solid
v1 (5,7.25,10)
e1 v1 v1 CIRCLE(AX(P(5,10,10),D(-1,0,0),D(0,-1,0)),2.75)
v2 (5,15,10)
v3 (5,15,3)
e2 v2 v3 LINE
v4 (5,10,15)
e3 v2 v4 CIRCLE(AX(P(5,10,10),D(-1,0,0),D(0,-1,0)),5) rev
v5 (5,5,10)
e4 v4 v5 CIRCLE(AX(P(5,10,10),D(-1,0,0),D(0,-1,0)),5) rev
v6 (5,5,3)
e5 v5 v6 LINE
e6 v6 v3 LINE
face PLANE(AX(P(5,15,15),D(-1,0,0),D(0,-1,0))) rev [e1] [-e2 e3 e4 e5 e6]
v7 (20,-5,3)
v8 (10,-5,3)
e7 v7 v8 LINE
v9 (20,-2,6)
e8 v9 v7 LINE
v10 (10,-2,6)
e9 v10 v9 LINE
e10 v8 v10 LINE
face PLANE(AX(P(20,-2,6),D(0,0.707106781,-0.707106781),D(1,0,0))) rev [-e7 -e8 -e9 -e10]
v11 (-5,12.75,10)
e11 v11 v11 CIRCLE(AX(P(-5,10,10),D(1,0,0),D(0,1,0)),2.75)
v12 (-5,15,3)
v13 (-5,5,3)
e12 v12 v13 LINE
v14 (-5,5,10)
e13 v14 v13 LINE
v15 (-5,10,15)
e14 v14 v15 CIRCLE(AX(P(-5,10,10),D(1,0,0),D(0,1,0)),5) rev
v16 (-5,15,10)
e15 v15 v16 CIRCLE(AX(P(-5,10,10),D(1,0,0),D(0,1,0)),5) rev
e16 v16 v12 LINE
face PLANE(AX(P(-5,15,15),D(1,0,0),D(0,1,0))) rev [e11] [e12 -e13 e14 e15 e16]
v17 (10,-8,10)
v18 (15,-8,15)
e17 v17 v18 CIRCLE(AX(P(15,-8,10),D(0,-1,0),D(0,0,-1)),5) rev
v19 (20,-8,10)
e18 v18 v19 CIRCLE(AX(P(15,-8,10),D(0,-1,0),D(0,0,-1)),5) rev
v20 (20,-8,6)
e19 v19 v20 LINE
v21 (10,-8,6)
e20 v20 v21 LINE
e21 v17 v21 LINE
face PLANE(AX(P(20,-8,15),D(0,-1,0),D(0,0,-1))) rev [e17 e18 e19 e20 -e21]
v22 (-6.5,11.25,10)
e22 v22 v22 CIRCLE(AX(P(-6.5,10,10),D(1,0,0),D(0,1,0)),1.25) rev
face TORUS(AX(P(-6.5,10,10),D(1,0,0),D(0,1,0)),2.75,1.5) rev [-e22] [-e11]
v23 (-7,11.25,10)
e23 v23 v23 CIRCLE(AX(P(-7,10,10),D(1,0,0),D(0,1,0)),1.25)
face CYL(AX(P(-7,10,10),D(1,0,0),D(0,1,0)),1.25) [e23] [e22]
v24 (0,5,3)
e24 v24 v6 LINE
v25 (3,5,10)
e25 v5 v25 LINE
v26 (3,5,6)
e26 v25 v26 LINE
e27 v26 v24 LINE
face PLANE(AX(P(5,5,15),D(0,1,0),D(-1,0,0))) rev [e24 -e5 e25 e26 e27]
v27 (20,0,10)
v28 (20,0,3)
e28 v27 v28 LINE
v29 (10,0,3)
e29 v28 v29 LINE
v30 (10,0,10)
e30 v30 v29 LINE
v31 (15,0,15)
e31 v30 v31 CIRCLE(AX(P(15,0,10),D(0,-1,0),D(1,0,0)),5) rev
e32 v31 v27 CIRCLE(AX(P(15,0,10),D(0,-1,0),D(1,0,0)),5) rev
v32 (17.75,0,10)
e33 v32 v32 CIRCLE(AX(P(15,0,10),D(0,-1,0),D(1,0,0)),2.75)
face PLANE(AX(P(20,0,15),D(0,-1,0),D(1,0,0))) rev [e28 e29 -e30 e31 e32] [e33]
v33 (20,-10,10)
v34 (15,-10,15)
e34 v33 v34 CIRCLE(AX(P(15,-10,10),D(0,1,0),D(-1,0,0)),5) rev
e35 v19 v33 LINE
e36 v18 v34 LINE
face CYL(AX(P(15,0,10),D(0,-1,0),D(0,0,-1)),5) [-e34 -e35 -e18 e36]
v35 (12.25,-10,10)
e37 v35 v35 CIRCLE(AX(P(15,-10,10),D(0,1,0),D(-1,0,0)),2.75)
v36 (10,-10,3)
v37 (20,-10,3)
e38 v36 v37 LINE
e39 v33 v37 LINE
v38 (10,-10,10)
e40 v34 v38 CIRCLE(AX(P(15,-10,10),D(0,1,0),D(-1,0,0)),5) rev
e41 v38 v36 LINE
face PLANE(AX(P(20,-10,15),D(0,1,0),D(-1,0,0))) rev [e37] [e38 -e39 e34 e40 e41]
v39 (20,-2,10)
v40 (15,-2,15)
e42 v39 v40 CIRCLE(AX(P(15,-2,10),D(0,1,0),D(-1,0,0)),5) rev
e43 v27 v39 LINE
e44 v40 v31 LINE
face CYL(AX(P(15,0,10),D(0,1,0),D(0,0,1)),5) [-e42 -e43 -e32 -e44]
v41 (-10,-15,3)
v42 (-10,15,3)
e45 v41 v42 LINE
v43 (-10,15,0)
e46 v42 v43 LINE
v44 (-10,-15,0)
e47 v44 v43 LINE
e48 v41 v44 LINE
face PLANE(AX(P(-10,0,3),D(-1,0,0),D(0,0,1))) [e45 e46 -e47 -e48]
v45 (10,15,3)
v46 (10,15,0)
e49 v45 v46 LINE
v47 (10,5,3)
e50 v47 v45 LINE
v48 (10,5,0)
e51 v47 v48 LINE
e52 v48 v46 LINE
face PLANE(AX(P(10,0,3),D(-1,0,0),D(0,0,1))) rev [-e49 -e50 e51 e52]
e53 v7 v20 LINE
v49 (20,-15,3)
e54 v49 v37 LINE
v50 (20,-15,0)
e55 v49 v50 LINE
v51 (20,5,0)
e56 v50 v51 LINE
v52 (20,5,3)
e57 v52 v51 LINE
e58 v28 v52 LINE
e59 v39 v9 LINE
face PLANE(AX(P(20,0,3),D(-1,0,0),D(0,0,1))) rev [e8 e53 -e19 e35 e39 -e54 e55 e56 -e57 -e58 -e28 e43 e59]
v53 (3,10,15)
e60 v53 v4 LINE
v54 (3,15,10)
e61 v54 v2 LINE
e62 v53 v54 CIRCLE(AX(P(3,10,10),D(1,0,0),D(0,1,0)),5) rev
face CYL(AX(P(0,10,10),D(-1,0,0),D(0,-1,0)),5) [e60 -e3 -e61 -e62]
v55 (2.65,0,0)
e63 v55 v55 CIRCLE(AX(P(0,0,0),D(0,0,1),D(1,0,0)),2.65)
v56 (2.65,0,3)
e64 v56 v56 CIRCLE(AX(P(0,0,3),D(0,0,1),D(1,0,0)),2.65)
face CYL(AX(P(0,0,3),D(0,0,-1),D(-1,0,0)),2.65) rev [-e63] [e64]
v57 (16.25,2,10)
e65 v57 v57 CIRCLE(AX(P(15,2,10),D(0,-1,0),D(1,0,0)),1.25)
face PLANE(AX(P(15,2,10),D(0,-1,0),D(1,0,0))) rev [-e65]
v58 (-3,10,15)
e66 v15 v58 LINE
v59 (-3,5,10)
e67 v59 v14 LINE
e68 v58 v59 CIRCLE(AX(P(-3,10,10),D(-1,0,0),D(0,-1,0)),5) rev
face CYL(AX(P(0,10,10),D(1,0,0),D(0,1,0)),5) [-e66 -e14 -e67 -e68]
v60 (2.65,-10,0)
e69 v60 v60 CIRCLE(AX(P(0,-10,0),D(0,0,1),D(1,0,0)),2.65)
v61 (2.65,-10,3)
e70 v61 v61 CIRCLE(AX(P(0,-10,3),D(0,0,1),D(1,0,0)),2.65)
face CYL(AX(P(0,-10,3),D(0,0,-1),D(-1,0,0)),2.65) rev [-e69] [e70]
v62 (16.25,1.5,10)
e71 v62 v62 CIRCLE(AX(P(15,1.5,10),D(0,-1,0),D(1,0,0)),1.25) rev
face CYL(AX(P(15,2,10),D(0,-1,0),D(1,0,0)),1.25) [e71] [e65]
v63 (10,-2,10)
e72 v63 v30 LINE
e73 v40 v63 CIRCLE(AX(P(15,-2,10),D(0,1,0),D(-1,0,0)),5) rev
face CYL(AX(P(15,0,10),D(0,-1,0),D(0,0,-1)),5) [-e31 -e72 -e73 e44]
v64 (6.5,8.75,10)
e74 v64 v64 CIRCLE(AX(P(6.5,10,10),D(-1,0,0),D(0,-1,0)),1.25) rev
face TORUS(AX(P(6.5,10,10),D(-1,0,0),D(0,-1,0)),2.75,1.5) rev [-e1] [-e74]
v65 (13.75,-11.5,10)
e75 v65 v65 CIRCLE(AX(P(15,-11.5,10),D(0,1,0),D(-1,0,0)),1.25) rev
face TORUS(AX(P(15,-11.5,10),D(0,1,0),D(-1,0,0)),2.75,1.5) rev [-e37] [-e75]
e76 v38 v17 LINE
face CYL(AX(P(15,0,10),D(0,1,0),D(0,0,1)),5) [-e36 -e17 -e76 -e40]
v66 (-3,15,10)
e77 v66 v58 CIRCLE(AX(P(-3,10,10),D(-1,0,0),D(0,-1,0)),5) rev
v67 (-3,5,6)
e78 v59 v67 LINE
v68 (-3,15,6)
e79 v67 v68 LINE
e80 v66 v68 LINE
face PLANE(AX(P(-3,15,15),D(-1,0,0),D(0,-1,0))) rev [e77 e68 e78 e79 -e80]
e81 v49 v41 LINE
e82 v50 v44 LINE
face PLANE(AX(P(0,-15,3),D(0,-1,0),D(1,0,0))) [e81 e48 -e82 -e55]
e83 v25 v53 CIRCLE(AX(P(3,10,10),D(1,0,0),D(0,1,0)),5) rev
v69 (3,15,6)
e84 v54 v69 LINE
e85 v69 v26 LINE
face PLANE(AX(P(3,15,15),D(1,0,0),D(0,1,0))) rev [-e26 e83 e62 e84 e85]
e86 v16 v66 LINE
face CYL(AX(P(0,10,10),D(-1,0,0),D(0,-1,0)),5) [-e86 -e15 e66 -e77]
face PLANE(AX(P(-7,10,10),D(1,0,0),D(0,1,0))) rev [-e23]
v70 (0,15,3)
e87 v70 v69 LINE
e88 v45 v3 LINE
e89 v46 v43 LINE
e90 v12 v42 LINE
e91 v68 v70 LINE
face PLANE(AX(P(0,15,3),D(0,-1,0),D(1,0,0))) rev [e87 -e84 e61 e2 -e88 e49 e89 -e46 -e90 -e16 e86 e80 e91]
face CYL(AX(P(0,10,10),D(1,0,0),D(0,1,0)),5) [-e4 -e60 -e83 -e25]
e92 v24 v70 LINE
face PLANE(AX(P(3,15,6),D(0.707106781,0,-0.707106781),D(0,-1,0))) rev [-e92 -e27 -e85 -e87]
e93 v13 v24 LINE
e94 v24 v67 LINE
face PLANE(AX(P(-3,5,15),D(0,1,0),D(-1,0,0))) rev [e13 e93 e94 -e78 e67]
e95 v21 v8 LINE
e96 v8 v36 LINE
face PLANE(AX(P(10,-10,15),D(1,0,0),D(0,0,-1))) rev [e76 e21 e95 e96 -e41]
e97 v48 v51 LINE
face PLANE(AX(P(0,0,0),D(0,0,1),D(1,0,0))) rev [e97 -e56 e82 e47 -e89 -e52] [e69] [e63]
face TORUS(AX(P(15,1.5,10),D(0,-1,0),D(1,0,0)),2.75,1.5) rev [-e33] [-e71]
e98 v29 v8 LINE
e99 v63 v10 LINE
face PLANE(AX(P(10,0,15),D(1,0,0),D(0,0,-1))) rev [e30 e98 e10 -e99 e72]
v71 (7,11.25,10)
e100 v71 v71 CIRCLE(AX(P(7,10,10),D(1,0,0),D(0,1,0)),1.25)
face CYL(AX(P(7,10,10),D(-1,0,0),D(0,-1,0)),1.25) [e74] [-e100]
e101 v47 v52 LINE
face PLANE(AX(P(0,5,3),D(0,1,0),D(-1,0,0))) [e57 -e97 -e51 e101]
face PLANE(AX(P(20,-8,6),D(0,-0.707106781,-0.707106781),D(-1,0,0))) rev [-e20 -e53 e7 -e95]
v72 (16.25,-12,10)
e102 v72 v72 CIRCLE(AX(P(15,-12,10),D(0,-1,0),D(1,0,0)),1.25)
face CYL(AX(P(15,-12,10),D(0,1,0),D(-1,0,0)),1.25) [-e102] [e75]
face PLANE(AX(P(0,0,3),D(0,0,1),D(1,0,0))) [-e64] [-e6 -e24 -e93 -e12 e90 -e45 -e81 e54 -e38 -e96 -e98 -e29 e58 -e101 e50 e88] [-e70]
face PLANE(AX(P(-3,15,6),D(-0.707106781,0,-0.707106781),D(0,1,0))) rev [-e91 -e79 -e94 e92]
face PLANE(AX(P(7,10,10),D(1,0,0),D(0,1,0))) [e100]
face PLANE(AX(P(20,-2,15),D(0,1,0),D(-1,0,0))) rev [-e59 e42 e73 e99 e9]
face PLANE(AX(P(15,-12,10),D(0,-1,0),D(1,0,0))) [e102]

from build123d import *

# Parameters (mm, degrees)
SKETCH1_W           = 20
SKETCH1_H           = 30
SKETCH1_R           = 2.65
SKETCH1_W_2         = 10
SKETCH1_H_2         = 20
BOSS_EXTRUDE1_DEPTH = 3
SKETCH2_W           = 10
SKETCH2_H           = 2
SKETCH2_W_2         = 2
SKETCH2_H_2         = 10
BOSS_EXTRUDE2_DEPTH = 12
FILLET1_R           = 5
SKETCH3_R           = 1.25
BOSS_EXTRUDE3_DEPTH = 2
BOSS_EXTRUDE4_START = -12
SKETCH3_2_R         = 1.25
BOSS_EXTRUDE4_DEPTH = 2
SKETCH4_R           = 1.25
BOSS_EXTRUDE5_DEPTH = 2
BOSS_EXTRUDE6_START = -12
SKETCH4_3_R         = 1.25
BOSS_EXTRUDE6_DEPTH = 2
FILLET2_R           = 1.5
CHAMFER1_SIZE       = 3


with BuildPart() as part:
    # Sketch1 → Boss-Extrude1 (new body)
    # profile 1 of 2: a face of its own
    with BuildSketch(Plane.XY):
        Rectangle(SKETCH1_W, SKETCH1_H)
        Circle(SKETCH1_R, mode=Mode.SUBTRACT)
        with Locations((0, -10)):
            Circle(SKETCH1_R, mode=Mode.SUBTRACT)
    # profile 2 of 2: a face of its own
    with BuildSketch(Plane.XY):
        with Locations((15, -5)):
            Rectangle(SKETCH1_W_2, SKETCH1_H_2)
    extrude(amount=BOSS_EXTRUDE1_DEPTH)

    # Sketch2 → Boss-Extrude2 (add)
    with BuildSketch(Plane.XY.offset(3)):
        with Locations((15, -9)):
            Rectangle(SKETCH2_W, SKETCH2_H)
        with Locations((15, -1)):
            Rectangle(SKETCH2_W, SKETCH2_H)
        with Locations((4, 10)):
            Rectangle(SKETCH2_W_2, SKETCH2_H_2)
        with Locations((-4, 10)):
            Rectangle(SKETCH2_W_2, SKETCH2_H_2)
    extrude(amount=BOSS_EXTRUDE2_DEPTH)

    # Fillet1
    fillet1_edges = [part.edges().sort_by_distance(p)[0] for p in [
        (-4, 15, 15),
        (-4, 5, 15),
        (4, 15, 15),
        (4, 5, 15),
        (10, -1, 15),
        (20, -1, 15),
        (20, -9, 15),
        (10, -9, 15),
    ]]
    fillet(fillet1_edges, radius=FILLET1_R - 0.0001)  # a hair under: the kernel refuses the full size

    # Sketch3 → Boss-Extrude3 (add)
    with BuildSketch(Plane.XZ.offset(10)):
        with Locations(Location((15, 10, 0), (0, 0, 180))):
            Circle(SKETCH3_R)
    extrude(amount=BOSS_EXTRUDE3_DEPTH)

    # Sketch3<2> → Boss-Extrude4 (add)
    with BuildSketch(Plane.XZ.offset(10).offset(BOSS_EXTRUDE4_START)):
        with Locations(Location((15, 10, 0), (0, 0, 180))):
            Circle(SKETCH3_2_R)
    extrude(amount=BOSS_EXTRUDE4_DEPTH)

    # Sketch4 → Boss-Extrude5 (add)
    with BuildSketch(Plane(origin=(5, 0, 0), x_dir=(0, 0, -1), z_dir=(1, 0, 0))):
        with Locations(Location((-10, 10, 0), (0, 0, 270))):
            Circle(SKETCH4_R)
    extrude(amount=BOSS_EXTRUDE5_DEPTH)

    # Sketch4<3> → Boss-Extrude6 (add)
    with BuildSketch(Plane(origin=(5, 0, 0), x_dir=(0, 0, -1), z_dir=(1, 0, 0)).offset(BOSS_EXTRUDE6_START)):
        with Locations(Location((-10, 10, 0), (0, 0, 270))):
            Circle(SKETCH4_3_R)
    extrude(amount=BOSS_EXTRUDE6_DEPTH)

    # Fillet2
    fillet2_edges = [part.edges().sort_by_distance(p)[0] for p in [
        (16.25, -10, 10),
        (16.25, 0, 10),
        (5, 11.25, 10),
        (-5, 11.25, 10),
    ]]
    fillet(fillet2_edges, radius=FILLET2_R)

    # Chamfer1
    chamfer1_edges = [part.edges().sort_by_distance(p)[0] for p in [
        (15, -8, 3),
        (15, -2, 3),
        (-3, 10, 3),
        (3, 10, 3),
    ]]
    chamfer(chamfer1_edges, length=CHAMFER1_SIZE - 0.0001)  # a hair under: the kernel refuses the full size


solid = part.part
